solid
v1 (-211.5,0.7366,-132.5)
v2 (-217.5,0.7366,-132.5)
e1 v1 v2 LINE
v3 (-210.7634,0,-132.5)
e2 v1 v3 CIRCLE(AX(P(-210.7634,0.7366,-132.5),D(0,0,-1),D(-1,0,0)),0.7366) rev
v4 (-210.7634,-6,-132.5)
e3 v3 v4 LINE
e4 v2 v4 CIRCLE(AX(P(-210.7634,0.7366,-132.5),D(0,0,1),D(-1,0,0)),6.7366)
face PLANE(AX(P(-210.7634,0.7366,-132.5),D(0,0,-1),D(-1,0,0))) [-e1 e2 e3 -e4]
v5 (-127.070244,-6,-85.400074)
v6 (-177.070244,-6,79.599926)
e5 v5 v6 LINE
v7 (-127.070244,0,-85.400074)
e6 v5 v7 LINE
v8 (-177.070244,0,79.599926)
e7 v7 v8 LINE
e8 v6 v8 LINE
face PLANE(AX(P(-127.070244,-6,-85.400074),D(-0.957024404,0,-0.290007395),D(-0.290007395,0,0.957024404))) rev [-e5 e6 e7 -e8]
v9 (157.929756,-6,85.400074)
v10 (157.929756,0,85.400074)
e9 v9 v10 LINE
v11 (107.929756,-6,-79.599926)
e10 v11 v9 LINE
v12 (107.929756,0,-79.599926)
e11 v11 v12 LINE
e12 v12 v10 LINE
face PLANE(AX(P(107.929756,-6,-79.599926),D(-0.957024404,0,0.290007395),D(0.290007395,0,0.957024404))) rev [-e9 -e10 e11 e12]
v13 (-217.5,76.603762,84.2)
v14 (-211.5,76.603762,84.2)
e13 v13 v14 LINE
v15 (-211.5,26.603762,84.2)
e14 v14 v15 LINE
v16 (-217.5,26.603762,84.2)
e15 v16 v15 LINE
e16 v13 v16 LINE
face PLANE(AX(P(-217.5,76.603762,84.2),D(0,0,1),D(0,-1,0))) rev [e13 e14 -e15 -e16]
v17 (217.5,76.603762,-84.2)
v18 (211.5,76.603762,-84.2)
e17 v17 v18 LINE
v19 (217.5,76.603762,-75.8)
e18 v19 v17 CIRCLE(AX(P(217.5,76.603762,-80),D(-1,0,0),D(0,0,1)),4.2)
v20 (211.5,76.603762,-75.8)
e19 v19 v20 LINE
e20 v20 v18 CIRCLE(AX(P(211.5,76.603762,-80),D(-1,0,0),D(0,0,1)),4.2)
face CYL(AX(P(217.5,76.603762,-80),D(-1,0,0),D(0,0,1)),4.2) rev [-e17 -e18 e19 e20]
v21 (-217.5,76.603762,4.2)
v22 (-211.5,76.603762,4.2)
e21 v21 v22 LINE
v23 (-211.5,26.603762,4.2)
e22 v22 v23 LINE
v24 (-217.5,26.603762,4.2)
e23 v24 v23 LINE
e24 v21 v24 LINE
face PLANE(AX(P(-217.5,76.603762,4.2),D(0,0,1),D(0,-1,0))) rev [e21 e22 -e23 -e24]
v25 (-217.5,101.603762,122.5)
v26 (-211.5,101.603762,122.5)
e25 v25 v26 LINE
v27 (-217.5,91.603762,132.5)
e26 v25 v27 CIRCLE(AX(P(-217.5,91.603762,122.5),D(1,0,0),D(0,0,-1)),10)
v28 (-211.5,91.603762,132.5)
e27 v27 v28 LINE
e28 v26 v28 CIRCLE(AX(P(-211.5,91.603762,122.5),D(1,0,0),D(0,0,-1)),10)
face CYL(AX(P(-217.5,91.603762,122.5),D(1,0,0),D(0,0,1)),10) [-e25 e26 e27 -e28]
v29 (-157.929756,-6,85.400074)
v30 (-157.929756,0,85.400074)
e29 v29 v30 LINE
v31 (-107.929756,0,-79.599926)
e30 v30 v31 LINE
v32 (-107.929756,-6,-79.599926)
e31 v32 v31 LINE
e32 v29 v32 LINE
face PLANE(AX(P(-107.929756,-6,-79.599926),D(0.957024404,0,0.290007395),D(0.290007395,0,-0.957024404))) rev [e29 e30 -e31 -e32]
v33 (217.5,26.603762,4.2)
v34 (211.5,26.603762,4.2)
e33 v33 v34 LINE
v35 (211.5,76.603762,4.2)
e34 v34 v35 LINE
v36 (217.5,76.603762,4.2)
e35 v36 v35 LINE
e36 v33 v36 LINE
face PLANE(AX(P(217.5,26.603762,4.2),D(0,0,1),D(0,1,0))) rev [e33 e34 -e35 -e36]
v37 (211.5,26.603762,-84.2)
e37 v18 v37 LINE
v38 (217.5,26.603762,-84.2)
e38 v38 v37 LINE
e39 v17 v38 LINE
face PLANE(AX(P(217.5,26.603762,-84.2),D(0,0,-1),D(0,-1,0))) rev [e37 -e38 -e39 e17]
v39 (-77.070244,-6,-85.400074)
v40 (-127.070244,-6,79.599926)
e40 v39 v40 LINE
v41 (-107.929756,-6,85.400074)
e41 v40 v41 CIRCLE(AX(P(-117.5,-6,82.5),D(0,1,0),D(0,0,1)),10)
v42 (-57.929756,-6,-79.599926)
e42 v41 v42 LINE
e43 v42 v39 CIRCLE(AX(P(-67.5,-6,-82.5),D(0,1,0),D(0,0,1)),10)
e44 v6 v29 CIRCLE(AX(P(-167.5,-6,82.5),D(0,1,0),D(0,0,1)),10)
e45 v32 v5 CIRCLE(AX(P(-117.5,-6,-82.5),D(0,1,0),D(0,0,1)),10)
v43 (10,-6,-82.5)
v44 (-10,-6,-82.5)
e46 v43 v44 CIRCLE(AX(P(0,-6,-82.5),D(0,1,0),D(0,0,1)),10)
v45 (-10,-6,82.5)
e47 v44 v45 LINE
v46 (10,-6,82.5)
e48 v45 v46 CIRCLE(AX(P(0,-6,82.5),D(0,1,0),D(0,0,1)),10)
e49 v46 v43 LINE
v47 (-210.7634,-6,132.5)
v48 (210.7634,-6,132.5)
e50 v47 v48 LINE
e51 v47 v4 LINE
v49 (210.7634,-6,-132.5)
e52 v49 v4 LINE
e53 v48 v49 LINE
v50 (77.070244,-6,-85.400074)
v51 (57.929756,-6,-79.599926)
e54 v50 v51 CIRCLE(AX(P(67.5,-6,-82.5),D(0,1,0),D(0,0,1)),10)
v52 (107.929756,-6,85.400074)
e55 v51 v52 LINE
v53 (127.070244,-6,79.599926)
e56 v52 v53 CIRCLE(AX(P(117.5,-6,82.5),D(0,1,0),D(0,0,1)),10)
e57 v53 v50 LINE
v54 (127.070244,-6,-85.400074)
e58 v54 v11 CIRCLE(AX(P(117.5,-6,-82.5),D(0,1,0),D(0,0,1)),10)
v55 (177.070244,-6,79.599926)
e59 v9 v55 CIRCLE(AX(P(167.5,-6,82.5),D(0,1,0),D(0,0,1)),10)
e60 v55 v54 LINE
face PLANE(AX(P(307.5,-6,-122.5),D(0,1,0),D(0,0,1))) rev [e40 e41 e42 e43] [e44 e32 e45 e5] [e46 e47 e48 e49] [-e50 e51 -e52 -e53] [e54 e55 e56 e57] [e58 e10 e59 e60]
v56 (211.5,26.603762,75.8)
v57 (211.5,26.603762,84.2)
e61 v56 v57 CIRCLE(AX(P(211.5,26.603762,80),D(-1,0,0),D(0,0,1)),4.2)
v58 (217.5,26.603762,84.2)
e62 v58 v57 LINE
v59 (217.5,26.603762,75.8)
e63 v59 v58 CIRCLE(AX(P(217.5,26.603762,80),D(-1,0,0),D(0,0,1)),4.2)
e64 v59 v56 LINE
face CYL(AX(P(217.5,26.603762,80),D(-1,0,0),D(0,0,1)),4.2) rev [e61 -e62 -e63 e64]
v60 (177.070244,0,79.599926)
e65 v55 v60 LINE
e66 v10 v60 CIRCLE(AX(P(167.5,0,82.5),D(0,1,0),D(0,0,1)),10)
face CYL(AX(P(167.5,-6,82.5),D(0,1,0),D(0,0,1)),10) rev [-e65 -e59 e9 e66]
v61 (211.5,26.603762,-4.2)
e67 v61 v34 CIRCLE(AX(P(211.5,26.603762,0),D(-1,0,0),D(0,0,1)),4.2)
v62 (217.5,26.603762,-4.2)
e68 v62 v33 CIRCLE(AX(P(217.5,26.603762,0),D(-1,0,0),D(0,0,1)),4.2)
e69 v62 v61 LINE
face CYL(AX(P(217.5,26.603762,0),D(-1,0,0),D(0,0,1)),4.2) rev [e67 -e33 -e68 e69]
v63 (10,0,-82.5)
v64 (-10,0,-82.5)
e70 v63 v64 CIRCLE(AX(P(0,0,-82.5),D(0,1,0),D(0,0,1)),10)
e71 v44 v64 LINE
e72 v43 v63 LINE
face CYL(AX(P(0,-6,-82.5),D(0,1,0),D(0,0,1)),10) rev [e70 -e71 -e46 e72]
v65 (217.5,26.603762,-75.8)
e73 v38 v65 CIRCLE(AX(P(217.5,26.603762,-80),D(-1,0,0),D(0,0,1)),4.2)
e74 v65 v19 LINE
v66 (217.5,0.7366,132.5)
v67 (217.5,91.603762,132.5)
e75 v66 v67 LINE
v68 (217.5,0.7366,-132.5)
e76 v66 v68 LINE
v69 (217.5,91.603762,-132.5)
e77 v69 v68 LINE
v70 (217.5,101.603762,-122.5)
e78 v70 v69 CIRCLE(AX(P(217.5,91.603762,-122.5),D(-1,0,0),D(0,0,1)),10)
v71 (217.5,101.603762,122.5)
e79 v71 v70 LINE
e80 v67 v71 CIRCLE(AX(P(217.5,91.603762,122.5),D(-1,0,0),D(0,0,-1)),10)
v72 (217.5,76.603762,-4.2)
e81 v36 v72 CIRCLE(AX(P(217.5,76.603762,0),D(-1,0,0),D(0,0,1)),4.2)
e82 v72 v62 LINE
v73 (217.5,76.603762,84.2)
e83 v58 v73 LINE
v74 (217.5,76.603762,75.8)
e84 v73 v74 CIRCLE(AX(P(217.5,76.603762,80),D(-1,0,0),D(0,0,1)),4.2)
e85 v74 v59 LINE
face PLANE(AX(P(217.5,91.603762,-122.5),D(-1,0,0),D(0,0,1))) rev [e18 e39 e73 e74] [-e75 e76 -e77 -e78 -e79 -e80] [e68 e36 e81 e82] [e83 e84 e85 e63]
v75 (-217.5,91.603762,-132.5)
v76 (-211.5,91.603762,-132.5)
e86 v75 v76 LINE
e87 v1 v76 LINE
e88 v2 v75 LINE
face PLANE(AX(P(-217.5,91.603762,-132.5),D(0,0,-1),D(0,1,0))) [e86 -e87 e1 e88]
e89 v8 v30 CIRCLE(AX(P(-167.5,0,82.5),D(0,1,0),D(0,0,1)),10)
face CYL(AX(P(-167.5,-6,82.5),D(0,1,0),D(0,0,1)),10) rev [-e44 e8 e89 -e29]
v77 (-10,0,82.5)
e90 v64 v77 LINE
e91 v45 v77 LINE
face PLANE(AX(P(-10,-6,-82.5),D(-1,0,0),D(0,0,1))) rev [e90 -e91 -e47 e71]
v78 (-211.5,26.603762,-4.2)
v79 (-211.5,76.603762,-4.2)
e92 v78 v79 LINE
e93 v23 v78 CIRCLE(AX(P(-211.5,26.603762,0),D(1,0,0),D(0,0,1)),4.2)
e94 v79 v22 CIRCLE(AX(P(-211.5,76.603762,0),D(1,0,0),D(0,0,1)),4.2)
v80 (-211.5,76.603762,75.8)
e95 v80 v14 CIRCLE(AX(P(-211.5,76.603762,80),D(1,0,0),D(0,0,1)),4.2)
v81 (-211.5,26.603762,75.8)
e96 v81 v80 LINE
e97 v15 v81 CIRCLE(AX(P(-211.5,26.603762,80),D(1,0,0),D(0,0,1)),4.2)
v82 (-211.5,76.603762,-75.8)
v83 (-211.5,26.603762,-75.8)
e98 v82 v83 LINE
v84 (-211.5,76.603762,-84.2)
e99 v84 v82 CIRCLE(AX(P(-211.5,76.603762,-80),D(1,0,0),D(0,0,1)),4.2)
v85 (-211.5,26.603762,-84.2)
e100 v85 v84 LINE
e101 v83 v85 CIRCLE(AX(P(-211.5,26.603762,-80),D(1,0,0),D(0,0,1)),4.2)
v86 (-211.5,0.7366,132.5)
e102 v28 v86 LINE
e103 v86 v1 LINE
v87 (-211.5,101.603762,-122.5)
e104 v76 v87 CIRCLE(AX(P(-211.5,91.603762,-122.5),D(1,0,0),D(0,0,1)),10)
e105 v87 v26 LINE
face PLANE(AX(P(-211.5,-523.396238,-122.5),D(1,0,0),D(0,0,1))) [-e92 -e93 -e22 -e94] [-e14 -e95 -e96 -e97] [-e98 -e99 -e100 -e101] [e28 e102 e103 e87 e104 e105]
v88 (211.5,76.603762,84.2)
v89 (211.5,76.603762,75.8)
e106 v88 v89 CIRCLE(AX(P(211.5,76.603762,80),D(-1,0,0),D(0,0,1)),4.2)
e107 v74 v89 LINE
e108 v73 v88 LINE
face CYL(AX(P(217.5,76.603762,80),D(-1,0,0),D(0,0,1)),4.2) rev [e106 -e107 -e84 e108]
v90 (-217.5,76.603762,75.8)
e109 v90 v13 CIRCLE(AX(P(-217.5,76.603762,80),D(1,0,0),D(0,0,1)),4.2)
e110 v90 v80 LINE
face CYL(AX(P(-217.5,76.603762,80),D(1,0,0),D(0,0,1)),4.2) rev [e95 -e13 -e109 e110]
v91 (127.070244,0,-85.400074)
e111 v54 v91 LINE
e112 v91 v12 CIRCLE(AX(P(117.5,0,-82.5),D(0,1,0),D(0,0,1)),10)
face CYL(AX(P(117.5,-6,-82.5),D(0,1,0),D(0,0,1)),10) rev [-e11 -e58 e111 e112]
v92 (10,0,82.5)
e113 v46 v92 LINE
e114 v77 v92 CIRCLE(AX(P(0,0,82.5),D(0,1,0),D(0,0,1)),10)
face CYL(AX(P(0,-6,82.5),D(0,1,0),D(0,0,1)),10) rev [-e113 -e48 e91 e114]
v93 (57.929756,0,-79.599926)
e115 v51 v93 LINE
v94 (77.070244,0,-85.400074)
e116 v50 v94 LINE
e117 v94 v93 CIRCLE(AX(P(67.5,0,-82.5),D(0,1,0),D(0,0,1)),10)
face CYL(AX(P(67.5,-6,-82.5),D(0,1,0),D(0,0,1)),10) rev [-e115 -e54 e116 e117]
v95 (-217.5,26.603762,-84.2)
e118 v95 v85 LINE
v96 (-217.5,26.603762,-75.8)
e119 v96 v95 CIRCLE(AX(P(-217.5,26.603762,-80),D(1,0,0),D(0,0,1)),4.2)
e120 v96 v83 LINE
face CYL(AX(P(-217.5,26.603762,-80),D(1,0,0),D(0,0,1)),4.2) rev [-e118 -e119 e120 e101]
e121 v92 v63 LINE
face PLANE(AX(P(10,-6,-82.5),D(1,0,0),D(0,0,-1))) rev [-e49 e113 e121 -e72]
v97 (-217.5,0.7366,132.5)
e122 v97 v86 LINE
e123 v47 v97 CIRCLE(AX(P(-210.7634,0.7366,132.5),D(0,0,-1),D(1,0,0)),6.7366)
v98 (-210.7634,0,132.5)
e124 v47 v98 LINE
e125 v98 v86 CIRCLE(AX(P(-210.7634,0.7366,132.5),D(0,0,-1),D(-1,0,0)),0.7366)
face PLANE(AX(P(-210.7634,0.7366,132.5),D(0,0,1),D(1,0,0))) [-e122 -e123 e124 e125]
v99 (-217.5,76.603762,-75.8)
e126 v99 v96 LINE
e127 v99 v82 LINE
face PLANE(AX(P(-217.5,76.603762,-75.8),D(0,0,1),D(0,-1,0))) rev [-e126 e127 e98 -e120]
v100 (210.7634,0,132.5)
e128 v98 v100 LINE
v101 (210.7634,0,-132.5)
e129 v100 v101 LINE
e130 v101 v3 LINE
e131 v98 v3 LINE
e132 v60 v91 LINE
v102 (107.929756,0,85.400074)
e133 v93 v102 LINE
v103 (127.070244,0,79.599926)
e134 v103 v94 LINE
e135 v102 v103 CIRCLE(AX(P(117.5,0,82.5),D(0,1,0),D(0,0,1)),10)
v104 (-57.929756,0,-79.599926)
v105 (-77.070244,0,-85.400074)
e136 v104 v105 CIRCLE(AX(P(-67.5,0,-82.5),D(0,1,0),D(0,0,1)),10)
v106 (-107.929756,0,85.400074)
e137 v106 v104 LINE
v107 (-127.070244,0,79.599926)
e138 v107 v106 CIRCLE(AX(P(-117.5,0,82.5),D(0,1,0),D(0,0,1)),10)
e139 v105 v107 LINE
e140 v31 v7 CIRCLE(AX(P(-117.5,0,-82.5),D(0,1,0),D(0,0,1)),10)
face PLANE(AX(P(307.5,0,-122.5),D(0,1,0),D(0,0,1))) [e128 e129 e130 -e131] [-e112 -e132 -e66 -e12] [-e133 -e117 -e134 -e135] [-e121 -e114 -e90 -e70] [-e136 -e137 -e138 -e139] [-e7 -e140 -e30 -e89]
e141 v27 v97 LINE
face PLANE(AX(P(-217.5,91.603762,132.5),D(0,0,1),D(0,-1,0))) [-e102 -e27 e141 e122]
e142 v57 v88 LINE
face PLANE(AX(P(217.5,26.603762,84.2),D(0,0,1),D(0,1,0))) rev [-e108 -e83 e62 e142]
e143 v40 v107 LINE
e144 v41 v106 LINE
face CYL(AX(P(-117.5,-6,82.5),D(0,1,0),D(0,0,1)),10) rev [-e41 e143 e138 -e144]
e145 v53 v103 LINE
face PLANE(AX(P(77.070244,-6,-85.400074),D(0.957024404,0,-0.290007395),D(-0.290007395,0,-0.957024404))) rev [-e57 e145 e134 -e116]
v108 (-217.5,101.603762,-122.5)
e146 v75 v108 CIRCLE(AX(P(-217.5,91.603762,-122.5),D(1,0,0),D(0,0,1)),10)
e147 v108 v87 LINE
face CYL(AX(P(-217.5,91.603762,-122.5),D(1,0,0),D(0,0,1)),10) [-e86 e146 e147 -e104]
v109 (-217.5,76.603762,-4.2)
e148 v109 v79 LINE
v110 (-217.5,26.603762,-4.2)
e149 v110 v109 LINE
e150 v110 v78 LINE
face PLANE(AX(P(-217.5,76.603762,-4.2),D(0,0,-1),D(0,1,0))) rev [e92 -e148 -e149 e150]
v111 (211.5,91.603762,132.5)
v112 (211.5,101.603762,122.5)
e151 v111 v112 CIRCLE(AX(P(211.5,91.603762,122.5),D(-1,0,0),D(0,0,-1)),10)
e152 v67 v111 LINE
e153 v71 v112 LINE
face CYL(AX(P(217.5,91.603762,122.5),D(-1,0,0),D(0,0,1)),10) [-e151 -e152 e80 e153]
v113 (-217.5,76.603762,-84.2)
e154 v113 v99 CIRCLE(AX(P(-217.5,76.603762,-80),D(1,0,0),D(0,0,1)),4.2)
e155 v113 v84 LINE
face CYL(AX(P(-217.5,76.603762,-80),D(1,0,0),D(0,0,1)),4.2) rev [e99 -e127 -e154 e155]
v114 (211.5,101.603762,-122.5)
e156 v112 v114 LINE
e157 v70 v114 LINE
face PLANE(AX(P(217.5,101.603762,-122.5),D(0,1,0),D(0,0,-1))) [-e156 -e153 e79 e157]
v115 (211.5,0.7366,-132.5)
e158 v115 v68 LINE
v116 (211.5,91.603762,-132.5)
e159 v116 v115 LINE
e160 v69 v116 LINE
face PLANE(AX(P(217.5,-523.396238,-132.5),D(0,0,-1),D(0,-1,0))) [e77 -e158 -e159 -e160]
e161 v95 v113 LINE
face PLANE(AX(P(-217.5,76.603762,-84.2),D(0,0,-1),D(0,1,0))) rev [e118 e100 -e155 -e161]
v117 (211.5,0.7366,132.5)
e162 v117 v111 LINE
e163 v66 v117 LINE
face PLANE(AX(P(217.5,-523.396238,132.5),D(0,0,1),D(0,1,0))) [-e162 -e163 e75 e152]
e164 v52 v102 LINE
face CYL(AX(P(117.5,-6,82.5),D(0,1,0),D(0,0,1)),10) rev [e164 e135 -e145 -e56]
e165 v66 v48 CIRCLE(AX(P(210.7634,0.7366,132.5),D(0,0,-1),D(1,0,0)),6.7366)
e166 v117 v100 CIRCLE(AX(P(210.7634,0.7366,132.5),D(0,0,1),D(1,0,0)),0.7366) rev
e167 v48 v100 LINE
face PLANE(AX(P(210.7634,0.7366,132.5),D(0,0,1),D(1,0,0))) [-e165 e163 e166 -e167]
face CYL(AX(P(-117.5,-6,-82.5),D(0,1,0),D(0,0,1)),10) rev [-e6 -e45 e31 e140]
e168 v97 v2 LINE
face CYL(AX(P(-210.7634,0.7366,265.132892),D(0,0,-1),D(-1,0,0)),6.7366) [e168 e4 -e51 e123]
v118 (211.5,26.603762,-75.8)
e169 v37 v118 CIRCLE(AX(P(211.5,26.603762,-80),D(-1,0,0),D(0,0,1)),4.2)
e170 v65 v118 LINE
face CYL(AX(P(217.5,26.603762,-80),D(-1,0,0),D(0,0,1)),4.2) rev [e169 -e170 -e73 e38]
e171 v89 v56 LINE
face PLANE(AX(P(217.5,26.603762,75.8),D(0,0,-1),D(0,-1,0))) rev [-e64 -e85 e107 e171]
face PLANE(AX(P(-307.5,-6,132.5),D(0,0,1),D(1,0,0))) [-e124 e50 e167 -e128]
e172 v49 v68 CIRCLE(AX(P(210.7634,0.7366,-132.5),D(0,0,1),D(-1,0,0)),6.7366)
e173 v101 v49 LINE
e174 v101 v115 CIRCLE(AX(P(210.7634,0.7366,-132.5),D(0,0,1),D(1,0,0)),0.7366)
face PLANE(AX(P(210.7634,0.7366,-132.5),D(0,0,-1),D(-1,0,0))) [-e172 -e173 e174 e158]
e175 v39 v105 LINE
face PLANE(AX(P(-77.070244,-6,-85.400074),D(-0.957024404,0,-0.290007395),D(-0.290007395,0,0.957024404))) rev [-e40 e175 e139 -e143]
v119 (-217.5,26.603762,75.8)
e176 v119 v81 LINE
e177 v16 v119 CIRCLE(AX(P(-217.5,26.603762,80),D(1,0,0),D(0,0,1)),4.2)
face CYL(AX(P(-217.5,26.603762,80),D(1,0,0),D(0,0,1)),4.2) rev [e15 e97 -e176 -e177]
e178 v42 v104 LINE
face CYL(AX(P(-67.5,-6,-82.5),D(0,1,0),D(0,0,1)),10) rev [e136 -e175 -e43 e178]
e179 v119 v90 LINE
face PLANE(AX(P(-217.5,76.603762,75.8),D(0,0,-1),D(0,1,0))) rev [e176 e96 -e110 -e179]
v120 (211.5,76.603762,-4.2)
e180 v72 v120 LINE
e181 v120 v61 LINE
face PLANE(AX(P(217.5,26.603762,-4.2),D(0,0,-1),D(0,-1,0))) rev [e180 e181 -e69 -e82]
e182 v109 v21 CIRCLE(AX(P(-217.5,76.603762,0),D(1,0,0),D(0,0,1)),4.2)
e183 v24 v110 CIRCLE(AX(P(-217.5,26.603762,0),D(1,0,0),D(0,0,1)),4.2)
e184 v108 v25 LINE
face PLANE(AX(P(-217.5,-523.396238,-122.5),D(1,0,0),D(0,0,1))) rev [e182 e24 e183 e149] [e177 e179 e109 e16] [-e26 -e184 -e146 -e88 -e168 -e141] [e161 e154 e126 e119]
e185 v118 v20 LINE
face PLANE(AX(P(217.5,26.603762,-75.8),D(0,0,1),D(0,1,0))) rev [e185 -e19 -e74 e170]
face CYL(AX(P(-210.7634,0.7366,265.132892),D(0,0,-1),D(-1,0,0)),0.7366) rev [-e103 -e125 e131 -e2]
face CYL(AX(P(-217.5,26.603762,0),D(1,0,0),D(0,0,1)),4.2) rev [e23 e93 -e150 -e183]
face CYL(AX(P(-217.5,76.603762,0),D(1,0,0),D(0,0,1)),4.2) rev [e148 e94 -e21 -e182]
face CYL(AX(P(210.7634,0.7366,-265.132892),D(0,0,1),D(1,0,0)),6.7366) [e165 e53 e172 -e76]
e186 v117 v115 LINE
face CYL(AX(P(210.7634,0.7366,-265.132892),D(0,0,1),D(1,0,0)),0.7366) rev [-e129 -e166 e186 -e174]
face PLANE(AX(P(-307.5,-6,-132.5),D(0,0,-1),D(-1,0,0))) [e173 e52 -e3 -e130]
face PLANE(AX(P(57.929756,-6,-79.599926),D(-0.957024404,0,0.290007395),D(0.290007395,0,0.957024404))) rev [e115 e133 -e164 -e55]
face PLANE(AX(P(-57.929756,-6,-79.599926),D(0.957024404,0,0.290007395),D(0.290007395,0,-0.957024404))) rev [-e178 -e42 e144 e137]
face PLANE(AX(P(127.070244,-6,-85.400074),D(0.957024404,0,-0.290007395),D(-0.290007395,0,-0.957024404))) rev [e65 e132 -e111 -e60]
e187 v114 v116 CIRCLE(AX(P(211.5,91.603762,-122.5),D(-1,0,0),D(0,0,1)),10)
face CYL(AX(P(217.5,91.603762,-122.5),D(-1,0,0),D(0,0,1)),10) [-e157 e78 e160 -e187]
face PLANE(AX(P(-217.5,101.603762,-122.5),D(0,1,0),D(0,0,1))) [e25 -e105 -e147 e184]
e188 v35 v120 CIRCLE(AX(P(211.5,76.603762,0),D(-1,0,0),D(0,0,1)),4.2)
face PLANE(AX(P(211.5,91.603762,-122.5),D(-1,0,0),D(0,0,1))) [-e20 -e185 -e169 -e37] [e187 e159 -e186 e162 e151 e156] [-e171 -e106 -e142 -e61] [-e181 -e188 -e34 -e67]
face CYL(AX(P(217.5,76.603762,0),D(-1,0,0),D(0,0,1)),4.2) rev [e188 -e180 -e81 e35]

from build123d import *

# Parameters (mm, degrees)
BASE_FLANGE1_DEPTH         = 6
SKETCHED_START             = -317.5
SKETCHED_BEND1_OUTLINE_W   = 6
SKETCHED_BEND1_OUTLINE_H   = 265
SKETCHED_BEND1_DEPTH       = 100
SKETCHED_START_2           = 217.5
SKETCHED_BEND1_2_OUTLINE_W = 6
SKETCHED_BEND1_2_OUTLINE_H = 265
SKETCHED_BEND1_2_DEPTH     = 100
SKETCHED_START_3           = -216.844798284
SKETCHED_BEND1_3_DEPTH     = 5.344798284
SKETCHED_START_4           = 211.5
SKETCHED_BEND1_4_DEPTH     = 5.344798284
SKETCHED_START_5           = -217.5
SKETCHED_BEND1_5_DEPTH     = 6.7366
SKETCHED_START_6           = 210.7634
SKETCHED_BEND1_6_DEPTH     = 6.7366
SKETCHED_START_7           = -133
SKETCHED_BEND1_7_DEPTH     = 266


with BuildPart() as part:
    # Base-Flange1: sheet metal written as solids
    # Sketch1 → Base-Flange1 (new body)
    with BuildSketch(Plane(origin=(0, 0, 0), x_dir=(1, 0, 0), z_dir=(0, 1, 0))):
        with BuildLine():
            Line((-307.5, 132.5), (307.5, 132.5))
            ThreePointArc((307.5, 132.5), (314.571067812, 129.571067812), (317.5, 122.5))
            Line((317.5, 122.5), (317.5, -122.5))
            ThreePointArc((317.5, -122.5), (314.571067812, -129.571067812), (307.5, -132.5))
            Line((307.5, -132.5), (-307.5, -132.5))
            ThreePointArc((-307.5, -132.5), (-314.571067812, -129.571067812), (-317.5, -122.5))
            Line((-317.5, -122.5), (-317.5, 122.5))
            ThreePointArc((-317.5, 122.5), (-314.571067812, 129.571067812), (-307.5, 132.5))
        make_face()
        with BuildLine():
            Line((-107.929755956, 79.599926047), (-157.929755956, -85.400073953))
            ThreePointArc((-157.929755956, -85.400073953), (-170.400073953, -92.070244044), (-177.070244044, -79.599926047))
            Line((-177.070244044, -79.599926047), (-127.070244044, 85.400073953))
            ThreePointArc((-127.070244044, 85.400073953), (-114.599926047, 92.070244044), (-107.929755956, 79.599926047))
        make_face(mode=Mode.SUBTRACT)
        with BuildLine():
            Line((-57.929755956, 79.599926047), (-107.929755956, -85.400073953))
            ThreePointArc((-107.929755956, -85.400073953), (-120.400073953, -92.070244044), (-127.070244044, -79.599926047))
            Line((-127.070244044, -79.599926047), (-77.070244044, 85.400073953))
            ThreePointArc((-77.070244044, 85.400073953), (-64.599926047, 92.070244044), (-57.929755956, 79.599926047))
        make_face(mode=Mode.SUBTRACT)
        with BuildLine():
            Line((77.070244044, 85.400073953), (127.070244044, -79.599926047))
            ThreePointArc((127.070244044, -79.599926047), (120.400073953, -92.070244044), (107.929755956, -85.400073953))
            Line((107.929755956, -85.400073953), (57.929755956, 79.599926047))
            ThreePointArc((57.929755956, 79.599926047), (64.599926047, 92.070244044), (77.070244044, 85.400073953))
        make_face(mode=Mode.SUBTRACT)
        with BuildLine():
            Line((127.070244044, 85.400073953), (177.070244044, -79.599926047))
            ThreePointArc((177.070244044, -79.599926047), (170.400073953, -92.070244044), (157.929755956, -85.400073953))
            Line((157.929755956, -85.400073953), (107.929755956, 79.599926047))
            ThreePointArc((107.929755956, 79.599926047), (114.599926047, 92.070244044), (127.070244044, 85.400073953))
        make_face(mode=Mode.SUBTRACT)
        with BuildLine():
            Line((-292.5, 84.2), (-242.5, 84.2))
            ThreePointArc((-242.5, 84.2), (-238.3, 80), (-242.5, 75.8))
            Line((-242.5, 75.8), (-292.5, 75.8))
            ThreePointArc((-292.5, 75.8), (-296.7, 80), (-292.5, 84.2))
        make_face(mode=Mode.SUBTRACT)
        with BuildLine():
            Line((-292.5, 4.2), (-242.5, 4.2))
            ThreePointArc((-242.5, 4.2), (-238.3, 0), (-242.5, -4.2))
            Line((-242.5, -4.2), (-292.5, -4.2))
            ThreePointArc((-292.5, -4.2), (-296.7, 0), (-292.5, 4.2))
        make_face(mode=Mode.SUBTRACT)
        with BuildLine():
            Line((-292.5, -75.8), (-242.5, -75.8))
            ThreePointArc((-242.5, -75.8), (-238.3, -80), (-242.5, -84.2))
            Line((-242.5, -84.2), (-292.5, -84.2))
            ThreePointArc((-292.5, -84.2), (-296.7, -80), (-292.5, -75.8))
        make_face(mode=Mode.SUBTRACT)
        with BuildLine():
            Line((242.5, 84.2), (292.5, 84.2))
            ThreePointArc((292.5, 84.2), (296.7, 80), (292.5, 75.8))
            Line((292.5, 75.8), (242.5, 75.8))
            ThreePointArc((242.5, 75.8), (238.3, 80), (242.5, 84.2))
        make_face(mode=Mode.SUBTRACT)
        with BuildLine():
            Line((242.5, 4.2), (292.5, 4.2))
            ThreePointArc((292.5, 4.2), (296.7, 0), (292.5, -4.2))
            Line((292.5, -4.2), (242.5, -4.2))
            ThreePointArc((242.5, -4.2), (238.3, 0), (242.5, 4.2))
        make_face(mode=Mode.SUBTRACT)
        with BuildLine():
            Line((242.5, -75.8), (292.5, -75.8))
            ThreePointArc((292.5, -75.8), (296.7, -80), (292.5, -84.2))
            Line((292.5, -84.2), (242.5, -84.2))
            ThreePointArc((242.5, -84.2), (238.3, -80), (242.5, -75.8))
        make_face(mode=Mode.SUBTRACT)
        with BuildLine():
            Line((10, 82.5), (10, -82.5))
            ThreePointArc((10, -82.5), (0, -92.5), (-10, -82.5))
            Line((-10, -82.5), (-10, 82.5))
            ThreePointArc((-10, 82.5), (0, 92.5), (10, 82.5))
        make_face(mode=Mode.SUBTRACT)
    extrude(amount=-BASE_FLANGE1_DEPTH)

    # Sketched Bend1: read off the stored shape, not the designer's step
    # Sketched Bend1 outline → Sketched Bend1 (cut)
    with BuildSketch(Plane.YZ.offset(SKETCHED_START)):
        with Locations((-3, 0)):
            Rectangle(SKETCHED_BEND1_OUTLINE_W, SKETCHED_BEND1_OUTLINE_H)
    extrude(amount=SKETCHED_BEND1_DEPTH, mode=Mode.SUBTRACT)

    # Sketched Bend1 2 outline → Sketched Bend1 2 (cut)
    with BuildSketch(Plane.YZ.offset(SKETCHED_START_2)):
        with Locations((-3, 0)):
            Rectangle(SKETCHED_BEND1_2_OUTLINE_W, SKETCHED_BEND1_2_OUTLINE_H)
    extrude(amount=SKETCHED_BEND1_2_DEPTH, mode=Mode.SUBTRACT)

    # Sketched Bend1 3 outline → Sketched Bend1 3 (add)
    with BuildSketch(Plane.YZ.offset(SKETCHED_START_3)):
        with BuildLine():
            Line((0, 132.5), (0, -132.5))
            Line((0, -132.5), (91.603762445, -132.5))
            ThreePointArc((91.603762445, -132.5), (98.674830257, -129.571067812), (101.603762445, -122.5))
            Line((101.603762445, -122.5), (101.603762445, 122.5))
            ThreePointArc((101.603762445, 122.5), (98.674830257, 129.571067812), (91.603762445, 132.5))
            Line((91.603762445, 132.5), (0, 132.5))
        make_face()
        with BuildLine():
            ThreePointArc((26.603762445, -84.2), (22.403762445, -80), (26.603762445, -75.8))
            Line((26.603762445, -75.8), (76.603762445, -75.8))
            ThreePointArc((76.603762445, -75.8), (80.803762445, -80), (76.603762445, -84.2))
            Line((76.603762445, -84.2), (26.603762445, -84.2))
        make_face(mode=Mode.SUBTRACT)
        with BuildLine():
            ThreePointArc((26.603762445, -4.2), (22.403762445, 0), (26.603762445, 4.2))
            Line((26.603762445, 4.2), (76.603762445, 4.2))
            ThreePointArc((76.603762445, 4.2), (80.803762445, 0), (76.603762445, -4.2))
            Line((76.603762445, -4.2), (26.603762445, -4.2))
        make_face(mode=Mode.SUBTRACT)
        with BuildLine():
            ThreePointArc((26.603762445, 75.8), (22.403762445, 80), (26.603762445, 84.2))
            Line((26.603762445, 84.2), (76.603762445, 84.2))
            ThreePointArc((76.603762445, 84.2), (80.803762445, 80), (76.603762445, 75.8))
            Line((76.603762445, 75.8), (26.603762445, 75.8))
        make_face(mode=Mode.SUBTRACT)
    extrude(amount=SKETCHED_BEND1_3_DEPTH)

    # Sketched Bend1 4 outline → Sketched Bend1 4 (add)
    with BuildSketch(Plane.YZ.offset(SKETCHED_START_4)):
        with BuildLine():
            Line((0, 132.5), (0, -132.5))
            Line((0, -132.5), (91.603762445, -132.5))
            ThreePointArc((91.603762445, -132.5), (98.674830257, -129.571067812), (101.603762445, -122.5))
            Line((101.603762445, -122.5), (101.603762445, 122.5))
            ThreePointArc((101.603762445, 122.5), (98.674830257, 129.571067812), (91.603762445, 132.5))
            Line((91.603762445, 132.5), (0, 132.5))
        make_face()
        with BuildLine():
            ThreePointArc((26.603762445, -84.2), (22.403762445, -80), (26.603762445, -75.8))
            Line((26.603762445, -75.8), (76.603762445, -75.8))
            ThreePointArc((76.603762445, -75.8), (80.803762445, -80), (76.603762445, -84.2))
            Line((76.603762445, -84.2), (26.603762445, -84.2))
        make_face(mode=Mode.SUBTRACT)
        with BuildLine():
            ThreePointArc((26.603762445, -4.2), (22.403762445, 0), (26.603762445, 4.2))
            Line((26.603762445, 4.2), (76.603762445, 4.2))
            ThreePointArc((76.603762445, 4.2), (80.803762445, 0), (76.603762445, -4.2))
            Line((76.603762445, -4.2), (26.603762445, -4.2))
        make_face(mode=Mode.SUBTRACT)
        with BuildLine():
            ThreePointArc((26.603762445, 75.8), (22.403762445, 80), (26.603762445, 84.2))
            Line((26.603762445, 84.2), (76.603762445, 84.2))
            ThreePointArc((76.603762445, 84.2), (80.803762445, 80), (76.603762445, 75.8))
            Line((76.603762445, 75.8), (26.603762445, 75.8))
        make_face(mode=Mode.SUBTRACT)
    extrude(amount=SKETCHED_BEND1_4_DEPTH)

    # Sketched Bend1 5 outline → Sketched Bend1 5 (add)
    with BuildSketch(Plane.YZ.offset(SKETCHED_START_5)):
        with BuildLine():
            Line((0, 132.5), (0, -132.5))
            Line((0, -132.5), (91.603762445, -132.5))
            ThreePointArc((91.603762445, -132.5), (98.674830257, -129.571067812), (101.603762445, -122.5))
            Line((101.603762445, -122.5), (101.603762445, 122.5))
            ThreePointArc((101.603762445, 122.5), (98.674830257, 129.571067812), (91.603762445, 132.5))
            Line((91.603762445, 132.5), (0, 132.5))
        make_face()
        with BuildLine():
            ThreePointArc((26.603762445, -84.2), (22.403762445, -80), (26.603762445, -75.8))
            Line((26.603762445, -75.8), (76.603762445, -75.8))
            ThreePointArc((76.603762445, -75.8), (80.803762445, -80), (76.603762445, -84.2))
            Line((76.603762445, -84.2), (26.603762445, -84.2))
        make_face(mode=Mode.SUBTRACT)
        with BuildLine():
            ThreePointArc((26.603762445, -4.2), (22.403762445, 0), (26.603762445, 4.2))
            Line((26.603762445, 4.2), (76.603762445, 4.2))
            ThreePointArc((76.603762445, 4.2), (80.803762445, 0), (76.603762445, -4.2))
            Line((76.603762445, -4.2), (26.603762445, -4.2))
        make_face(mode=Mode.SUBTRACT)
        with BuildLine():
            ThreePointArc((26.603762445, 75.8), (22.403762445, 80), (26.603762445, 84.2))
            Line((26.603762445, 84.2), (76.603762445, 84.2))
            ThreePointArc((76.603762445, 84.2), (80.803762445, 80), (76.603762445, 75.8))
            Line((76.603762445, 75.8), (26.603762445, 75.8))
        make_face(mode=Mode.SUBTRACT)
    extrude(amount=SKETCHED_BEND1_5_DEPTH)

    # Sketched Bend1 6 outline → Sketched Bend1 6 (add)
    with BuildSketch(Plane.YZ.offset(SKETCHED_START_6)):
        with BuildLine():
            Line((0, 132.5), (0, -132.5))
            Line((0, -132.5), (91.603762445, -132.5))
            ThreePointArc((91.603762445, -132.5), (98.674830257, -129.571067812), (101.603762445, -122.5))
            Line((101.603762445, -122.5), (101.603762445, 122.5))
            ThreePointArc((101.603762445, 122.5), (98.674830257, 129.571067812), (91.603762445, 132.5))
            Line((91.603762445, 132.5), (0, 132.5))
        make_face()
        with BuildLine():
            ThreePointArc((26.603762445, -84.2), (22.403762445, -80), (26.603762445, -75.8))
            Line((26.603762445, -75.8), (76.603762445, -75.8))
            ThreePointArc((76.603762445, -75.8), (80.803762445, -80), (76.603762445, -84.2))
            Line((76.603762445, -84.2), (26.603762445, -84.2))
        make_face(mode=Mode.SUBTRACT)
        with BuildLine():
            ThreePointArc((26.603762445, -4.2), (22.403762445, 0), (26.603762445, 4.2))
            Line((26.603762445, 4.2), (76.603762445, 4.2))
            ThreePointArc((76.603762445, 4.2), (80.803762445, 0), (76.603762445, -4.2))
            Line((76.603762445, -4.2), (26.603762445, -4.2))
        make_face(mode=Mode.SUBTRACT)
        with BuildLine():
            ThreePointArc((26.603762445, 75.8), (22.403762445, 80), (26.603762445, 84.2))
            Line((26.603762445, 84.2), (76.603762445, 84.2))
            ThreePointArc((76.603762445, 84.2), (80.803762445, 80), (76.603762445, 75.8))
            Line((76.603762445, 75.8), (26.603762445, 75.8))
        make_face(mode=Mode.SUBTRACT)
    extrude(amount=SKETCHED_BEND1_6_DEPTH)

    # Sketched Bend1 7 outline → Sketched Bend1 7 (cut)
    with BuildSketch(Plane.XY.offset(SKETCHED_START_7)):
        with BuildLine():
            Line((-217.5, -6), (-210.7634, -6))
            ThreePointArc((-210.7634, -6), (-215.526895542, -4.026895542), (-217.5, 0.7366))
            Line((-217.5, 0.7366), (-217.5, -6))
        make_face()
        with BuildLine():
            Line((211.5, 0.7366), (211.5, 101.603762445))
            Line((211.5, 101.603762445), (210.7634, 101.603762445))
            Line((210.7634, 101.603762445), (210.7634, 0))
            ThreePointArc((210.7634, 0), (211.284254855, 0.215745145), (211.5, 0.7366))
        make_face()
        with BuildLine():
            ThreePointArc((217.5, 0.7366), (215.526895542, -4.026895542), (210.7634, -6))
            Line((210.7634, -6), (217.5, -6))
            Line((217.5, -6), (217.5, 0.7366))
        make_face()
        with BuildLine():
            Line((-210.7634, 101.603762445), (-211.5, 101.603762445))
            Line((-211.5, 101.603762445), (-211.5, 0.7366))
            ThreePointArc((-211.5, 0.7366), (-211.284254855, 0.215745145), (-210.7634, 0))
            Line((-210.7634, 0), (-210.7634, 101.603762445))
        make_face()
    extrude(amount=SKETCHED_BEND1_7_DEPTH, mode=Mode.SUBTRACT)


solid = part.part
